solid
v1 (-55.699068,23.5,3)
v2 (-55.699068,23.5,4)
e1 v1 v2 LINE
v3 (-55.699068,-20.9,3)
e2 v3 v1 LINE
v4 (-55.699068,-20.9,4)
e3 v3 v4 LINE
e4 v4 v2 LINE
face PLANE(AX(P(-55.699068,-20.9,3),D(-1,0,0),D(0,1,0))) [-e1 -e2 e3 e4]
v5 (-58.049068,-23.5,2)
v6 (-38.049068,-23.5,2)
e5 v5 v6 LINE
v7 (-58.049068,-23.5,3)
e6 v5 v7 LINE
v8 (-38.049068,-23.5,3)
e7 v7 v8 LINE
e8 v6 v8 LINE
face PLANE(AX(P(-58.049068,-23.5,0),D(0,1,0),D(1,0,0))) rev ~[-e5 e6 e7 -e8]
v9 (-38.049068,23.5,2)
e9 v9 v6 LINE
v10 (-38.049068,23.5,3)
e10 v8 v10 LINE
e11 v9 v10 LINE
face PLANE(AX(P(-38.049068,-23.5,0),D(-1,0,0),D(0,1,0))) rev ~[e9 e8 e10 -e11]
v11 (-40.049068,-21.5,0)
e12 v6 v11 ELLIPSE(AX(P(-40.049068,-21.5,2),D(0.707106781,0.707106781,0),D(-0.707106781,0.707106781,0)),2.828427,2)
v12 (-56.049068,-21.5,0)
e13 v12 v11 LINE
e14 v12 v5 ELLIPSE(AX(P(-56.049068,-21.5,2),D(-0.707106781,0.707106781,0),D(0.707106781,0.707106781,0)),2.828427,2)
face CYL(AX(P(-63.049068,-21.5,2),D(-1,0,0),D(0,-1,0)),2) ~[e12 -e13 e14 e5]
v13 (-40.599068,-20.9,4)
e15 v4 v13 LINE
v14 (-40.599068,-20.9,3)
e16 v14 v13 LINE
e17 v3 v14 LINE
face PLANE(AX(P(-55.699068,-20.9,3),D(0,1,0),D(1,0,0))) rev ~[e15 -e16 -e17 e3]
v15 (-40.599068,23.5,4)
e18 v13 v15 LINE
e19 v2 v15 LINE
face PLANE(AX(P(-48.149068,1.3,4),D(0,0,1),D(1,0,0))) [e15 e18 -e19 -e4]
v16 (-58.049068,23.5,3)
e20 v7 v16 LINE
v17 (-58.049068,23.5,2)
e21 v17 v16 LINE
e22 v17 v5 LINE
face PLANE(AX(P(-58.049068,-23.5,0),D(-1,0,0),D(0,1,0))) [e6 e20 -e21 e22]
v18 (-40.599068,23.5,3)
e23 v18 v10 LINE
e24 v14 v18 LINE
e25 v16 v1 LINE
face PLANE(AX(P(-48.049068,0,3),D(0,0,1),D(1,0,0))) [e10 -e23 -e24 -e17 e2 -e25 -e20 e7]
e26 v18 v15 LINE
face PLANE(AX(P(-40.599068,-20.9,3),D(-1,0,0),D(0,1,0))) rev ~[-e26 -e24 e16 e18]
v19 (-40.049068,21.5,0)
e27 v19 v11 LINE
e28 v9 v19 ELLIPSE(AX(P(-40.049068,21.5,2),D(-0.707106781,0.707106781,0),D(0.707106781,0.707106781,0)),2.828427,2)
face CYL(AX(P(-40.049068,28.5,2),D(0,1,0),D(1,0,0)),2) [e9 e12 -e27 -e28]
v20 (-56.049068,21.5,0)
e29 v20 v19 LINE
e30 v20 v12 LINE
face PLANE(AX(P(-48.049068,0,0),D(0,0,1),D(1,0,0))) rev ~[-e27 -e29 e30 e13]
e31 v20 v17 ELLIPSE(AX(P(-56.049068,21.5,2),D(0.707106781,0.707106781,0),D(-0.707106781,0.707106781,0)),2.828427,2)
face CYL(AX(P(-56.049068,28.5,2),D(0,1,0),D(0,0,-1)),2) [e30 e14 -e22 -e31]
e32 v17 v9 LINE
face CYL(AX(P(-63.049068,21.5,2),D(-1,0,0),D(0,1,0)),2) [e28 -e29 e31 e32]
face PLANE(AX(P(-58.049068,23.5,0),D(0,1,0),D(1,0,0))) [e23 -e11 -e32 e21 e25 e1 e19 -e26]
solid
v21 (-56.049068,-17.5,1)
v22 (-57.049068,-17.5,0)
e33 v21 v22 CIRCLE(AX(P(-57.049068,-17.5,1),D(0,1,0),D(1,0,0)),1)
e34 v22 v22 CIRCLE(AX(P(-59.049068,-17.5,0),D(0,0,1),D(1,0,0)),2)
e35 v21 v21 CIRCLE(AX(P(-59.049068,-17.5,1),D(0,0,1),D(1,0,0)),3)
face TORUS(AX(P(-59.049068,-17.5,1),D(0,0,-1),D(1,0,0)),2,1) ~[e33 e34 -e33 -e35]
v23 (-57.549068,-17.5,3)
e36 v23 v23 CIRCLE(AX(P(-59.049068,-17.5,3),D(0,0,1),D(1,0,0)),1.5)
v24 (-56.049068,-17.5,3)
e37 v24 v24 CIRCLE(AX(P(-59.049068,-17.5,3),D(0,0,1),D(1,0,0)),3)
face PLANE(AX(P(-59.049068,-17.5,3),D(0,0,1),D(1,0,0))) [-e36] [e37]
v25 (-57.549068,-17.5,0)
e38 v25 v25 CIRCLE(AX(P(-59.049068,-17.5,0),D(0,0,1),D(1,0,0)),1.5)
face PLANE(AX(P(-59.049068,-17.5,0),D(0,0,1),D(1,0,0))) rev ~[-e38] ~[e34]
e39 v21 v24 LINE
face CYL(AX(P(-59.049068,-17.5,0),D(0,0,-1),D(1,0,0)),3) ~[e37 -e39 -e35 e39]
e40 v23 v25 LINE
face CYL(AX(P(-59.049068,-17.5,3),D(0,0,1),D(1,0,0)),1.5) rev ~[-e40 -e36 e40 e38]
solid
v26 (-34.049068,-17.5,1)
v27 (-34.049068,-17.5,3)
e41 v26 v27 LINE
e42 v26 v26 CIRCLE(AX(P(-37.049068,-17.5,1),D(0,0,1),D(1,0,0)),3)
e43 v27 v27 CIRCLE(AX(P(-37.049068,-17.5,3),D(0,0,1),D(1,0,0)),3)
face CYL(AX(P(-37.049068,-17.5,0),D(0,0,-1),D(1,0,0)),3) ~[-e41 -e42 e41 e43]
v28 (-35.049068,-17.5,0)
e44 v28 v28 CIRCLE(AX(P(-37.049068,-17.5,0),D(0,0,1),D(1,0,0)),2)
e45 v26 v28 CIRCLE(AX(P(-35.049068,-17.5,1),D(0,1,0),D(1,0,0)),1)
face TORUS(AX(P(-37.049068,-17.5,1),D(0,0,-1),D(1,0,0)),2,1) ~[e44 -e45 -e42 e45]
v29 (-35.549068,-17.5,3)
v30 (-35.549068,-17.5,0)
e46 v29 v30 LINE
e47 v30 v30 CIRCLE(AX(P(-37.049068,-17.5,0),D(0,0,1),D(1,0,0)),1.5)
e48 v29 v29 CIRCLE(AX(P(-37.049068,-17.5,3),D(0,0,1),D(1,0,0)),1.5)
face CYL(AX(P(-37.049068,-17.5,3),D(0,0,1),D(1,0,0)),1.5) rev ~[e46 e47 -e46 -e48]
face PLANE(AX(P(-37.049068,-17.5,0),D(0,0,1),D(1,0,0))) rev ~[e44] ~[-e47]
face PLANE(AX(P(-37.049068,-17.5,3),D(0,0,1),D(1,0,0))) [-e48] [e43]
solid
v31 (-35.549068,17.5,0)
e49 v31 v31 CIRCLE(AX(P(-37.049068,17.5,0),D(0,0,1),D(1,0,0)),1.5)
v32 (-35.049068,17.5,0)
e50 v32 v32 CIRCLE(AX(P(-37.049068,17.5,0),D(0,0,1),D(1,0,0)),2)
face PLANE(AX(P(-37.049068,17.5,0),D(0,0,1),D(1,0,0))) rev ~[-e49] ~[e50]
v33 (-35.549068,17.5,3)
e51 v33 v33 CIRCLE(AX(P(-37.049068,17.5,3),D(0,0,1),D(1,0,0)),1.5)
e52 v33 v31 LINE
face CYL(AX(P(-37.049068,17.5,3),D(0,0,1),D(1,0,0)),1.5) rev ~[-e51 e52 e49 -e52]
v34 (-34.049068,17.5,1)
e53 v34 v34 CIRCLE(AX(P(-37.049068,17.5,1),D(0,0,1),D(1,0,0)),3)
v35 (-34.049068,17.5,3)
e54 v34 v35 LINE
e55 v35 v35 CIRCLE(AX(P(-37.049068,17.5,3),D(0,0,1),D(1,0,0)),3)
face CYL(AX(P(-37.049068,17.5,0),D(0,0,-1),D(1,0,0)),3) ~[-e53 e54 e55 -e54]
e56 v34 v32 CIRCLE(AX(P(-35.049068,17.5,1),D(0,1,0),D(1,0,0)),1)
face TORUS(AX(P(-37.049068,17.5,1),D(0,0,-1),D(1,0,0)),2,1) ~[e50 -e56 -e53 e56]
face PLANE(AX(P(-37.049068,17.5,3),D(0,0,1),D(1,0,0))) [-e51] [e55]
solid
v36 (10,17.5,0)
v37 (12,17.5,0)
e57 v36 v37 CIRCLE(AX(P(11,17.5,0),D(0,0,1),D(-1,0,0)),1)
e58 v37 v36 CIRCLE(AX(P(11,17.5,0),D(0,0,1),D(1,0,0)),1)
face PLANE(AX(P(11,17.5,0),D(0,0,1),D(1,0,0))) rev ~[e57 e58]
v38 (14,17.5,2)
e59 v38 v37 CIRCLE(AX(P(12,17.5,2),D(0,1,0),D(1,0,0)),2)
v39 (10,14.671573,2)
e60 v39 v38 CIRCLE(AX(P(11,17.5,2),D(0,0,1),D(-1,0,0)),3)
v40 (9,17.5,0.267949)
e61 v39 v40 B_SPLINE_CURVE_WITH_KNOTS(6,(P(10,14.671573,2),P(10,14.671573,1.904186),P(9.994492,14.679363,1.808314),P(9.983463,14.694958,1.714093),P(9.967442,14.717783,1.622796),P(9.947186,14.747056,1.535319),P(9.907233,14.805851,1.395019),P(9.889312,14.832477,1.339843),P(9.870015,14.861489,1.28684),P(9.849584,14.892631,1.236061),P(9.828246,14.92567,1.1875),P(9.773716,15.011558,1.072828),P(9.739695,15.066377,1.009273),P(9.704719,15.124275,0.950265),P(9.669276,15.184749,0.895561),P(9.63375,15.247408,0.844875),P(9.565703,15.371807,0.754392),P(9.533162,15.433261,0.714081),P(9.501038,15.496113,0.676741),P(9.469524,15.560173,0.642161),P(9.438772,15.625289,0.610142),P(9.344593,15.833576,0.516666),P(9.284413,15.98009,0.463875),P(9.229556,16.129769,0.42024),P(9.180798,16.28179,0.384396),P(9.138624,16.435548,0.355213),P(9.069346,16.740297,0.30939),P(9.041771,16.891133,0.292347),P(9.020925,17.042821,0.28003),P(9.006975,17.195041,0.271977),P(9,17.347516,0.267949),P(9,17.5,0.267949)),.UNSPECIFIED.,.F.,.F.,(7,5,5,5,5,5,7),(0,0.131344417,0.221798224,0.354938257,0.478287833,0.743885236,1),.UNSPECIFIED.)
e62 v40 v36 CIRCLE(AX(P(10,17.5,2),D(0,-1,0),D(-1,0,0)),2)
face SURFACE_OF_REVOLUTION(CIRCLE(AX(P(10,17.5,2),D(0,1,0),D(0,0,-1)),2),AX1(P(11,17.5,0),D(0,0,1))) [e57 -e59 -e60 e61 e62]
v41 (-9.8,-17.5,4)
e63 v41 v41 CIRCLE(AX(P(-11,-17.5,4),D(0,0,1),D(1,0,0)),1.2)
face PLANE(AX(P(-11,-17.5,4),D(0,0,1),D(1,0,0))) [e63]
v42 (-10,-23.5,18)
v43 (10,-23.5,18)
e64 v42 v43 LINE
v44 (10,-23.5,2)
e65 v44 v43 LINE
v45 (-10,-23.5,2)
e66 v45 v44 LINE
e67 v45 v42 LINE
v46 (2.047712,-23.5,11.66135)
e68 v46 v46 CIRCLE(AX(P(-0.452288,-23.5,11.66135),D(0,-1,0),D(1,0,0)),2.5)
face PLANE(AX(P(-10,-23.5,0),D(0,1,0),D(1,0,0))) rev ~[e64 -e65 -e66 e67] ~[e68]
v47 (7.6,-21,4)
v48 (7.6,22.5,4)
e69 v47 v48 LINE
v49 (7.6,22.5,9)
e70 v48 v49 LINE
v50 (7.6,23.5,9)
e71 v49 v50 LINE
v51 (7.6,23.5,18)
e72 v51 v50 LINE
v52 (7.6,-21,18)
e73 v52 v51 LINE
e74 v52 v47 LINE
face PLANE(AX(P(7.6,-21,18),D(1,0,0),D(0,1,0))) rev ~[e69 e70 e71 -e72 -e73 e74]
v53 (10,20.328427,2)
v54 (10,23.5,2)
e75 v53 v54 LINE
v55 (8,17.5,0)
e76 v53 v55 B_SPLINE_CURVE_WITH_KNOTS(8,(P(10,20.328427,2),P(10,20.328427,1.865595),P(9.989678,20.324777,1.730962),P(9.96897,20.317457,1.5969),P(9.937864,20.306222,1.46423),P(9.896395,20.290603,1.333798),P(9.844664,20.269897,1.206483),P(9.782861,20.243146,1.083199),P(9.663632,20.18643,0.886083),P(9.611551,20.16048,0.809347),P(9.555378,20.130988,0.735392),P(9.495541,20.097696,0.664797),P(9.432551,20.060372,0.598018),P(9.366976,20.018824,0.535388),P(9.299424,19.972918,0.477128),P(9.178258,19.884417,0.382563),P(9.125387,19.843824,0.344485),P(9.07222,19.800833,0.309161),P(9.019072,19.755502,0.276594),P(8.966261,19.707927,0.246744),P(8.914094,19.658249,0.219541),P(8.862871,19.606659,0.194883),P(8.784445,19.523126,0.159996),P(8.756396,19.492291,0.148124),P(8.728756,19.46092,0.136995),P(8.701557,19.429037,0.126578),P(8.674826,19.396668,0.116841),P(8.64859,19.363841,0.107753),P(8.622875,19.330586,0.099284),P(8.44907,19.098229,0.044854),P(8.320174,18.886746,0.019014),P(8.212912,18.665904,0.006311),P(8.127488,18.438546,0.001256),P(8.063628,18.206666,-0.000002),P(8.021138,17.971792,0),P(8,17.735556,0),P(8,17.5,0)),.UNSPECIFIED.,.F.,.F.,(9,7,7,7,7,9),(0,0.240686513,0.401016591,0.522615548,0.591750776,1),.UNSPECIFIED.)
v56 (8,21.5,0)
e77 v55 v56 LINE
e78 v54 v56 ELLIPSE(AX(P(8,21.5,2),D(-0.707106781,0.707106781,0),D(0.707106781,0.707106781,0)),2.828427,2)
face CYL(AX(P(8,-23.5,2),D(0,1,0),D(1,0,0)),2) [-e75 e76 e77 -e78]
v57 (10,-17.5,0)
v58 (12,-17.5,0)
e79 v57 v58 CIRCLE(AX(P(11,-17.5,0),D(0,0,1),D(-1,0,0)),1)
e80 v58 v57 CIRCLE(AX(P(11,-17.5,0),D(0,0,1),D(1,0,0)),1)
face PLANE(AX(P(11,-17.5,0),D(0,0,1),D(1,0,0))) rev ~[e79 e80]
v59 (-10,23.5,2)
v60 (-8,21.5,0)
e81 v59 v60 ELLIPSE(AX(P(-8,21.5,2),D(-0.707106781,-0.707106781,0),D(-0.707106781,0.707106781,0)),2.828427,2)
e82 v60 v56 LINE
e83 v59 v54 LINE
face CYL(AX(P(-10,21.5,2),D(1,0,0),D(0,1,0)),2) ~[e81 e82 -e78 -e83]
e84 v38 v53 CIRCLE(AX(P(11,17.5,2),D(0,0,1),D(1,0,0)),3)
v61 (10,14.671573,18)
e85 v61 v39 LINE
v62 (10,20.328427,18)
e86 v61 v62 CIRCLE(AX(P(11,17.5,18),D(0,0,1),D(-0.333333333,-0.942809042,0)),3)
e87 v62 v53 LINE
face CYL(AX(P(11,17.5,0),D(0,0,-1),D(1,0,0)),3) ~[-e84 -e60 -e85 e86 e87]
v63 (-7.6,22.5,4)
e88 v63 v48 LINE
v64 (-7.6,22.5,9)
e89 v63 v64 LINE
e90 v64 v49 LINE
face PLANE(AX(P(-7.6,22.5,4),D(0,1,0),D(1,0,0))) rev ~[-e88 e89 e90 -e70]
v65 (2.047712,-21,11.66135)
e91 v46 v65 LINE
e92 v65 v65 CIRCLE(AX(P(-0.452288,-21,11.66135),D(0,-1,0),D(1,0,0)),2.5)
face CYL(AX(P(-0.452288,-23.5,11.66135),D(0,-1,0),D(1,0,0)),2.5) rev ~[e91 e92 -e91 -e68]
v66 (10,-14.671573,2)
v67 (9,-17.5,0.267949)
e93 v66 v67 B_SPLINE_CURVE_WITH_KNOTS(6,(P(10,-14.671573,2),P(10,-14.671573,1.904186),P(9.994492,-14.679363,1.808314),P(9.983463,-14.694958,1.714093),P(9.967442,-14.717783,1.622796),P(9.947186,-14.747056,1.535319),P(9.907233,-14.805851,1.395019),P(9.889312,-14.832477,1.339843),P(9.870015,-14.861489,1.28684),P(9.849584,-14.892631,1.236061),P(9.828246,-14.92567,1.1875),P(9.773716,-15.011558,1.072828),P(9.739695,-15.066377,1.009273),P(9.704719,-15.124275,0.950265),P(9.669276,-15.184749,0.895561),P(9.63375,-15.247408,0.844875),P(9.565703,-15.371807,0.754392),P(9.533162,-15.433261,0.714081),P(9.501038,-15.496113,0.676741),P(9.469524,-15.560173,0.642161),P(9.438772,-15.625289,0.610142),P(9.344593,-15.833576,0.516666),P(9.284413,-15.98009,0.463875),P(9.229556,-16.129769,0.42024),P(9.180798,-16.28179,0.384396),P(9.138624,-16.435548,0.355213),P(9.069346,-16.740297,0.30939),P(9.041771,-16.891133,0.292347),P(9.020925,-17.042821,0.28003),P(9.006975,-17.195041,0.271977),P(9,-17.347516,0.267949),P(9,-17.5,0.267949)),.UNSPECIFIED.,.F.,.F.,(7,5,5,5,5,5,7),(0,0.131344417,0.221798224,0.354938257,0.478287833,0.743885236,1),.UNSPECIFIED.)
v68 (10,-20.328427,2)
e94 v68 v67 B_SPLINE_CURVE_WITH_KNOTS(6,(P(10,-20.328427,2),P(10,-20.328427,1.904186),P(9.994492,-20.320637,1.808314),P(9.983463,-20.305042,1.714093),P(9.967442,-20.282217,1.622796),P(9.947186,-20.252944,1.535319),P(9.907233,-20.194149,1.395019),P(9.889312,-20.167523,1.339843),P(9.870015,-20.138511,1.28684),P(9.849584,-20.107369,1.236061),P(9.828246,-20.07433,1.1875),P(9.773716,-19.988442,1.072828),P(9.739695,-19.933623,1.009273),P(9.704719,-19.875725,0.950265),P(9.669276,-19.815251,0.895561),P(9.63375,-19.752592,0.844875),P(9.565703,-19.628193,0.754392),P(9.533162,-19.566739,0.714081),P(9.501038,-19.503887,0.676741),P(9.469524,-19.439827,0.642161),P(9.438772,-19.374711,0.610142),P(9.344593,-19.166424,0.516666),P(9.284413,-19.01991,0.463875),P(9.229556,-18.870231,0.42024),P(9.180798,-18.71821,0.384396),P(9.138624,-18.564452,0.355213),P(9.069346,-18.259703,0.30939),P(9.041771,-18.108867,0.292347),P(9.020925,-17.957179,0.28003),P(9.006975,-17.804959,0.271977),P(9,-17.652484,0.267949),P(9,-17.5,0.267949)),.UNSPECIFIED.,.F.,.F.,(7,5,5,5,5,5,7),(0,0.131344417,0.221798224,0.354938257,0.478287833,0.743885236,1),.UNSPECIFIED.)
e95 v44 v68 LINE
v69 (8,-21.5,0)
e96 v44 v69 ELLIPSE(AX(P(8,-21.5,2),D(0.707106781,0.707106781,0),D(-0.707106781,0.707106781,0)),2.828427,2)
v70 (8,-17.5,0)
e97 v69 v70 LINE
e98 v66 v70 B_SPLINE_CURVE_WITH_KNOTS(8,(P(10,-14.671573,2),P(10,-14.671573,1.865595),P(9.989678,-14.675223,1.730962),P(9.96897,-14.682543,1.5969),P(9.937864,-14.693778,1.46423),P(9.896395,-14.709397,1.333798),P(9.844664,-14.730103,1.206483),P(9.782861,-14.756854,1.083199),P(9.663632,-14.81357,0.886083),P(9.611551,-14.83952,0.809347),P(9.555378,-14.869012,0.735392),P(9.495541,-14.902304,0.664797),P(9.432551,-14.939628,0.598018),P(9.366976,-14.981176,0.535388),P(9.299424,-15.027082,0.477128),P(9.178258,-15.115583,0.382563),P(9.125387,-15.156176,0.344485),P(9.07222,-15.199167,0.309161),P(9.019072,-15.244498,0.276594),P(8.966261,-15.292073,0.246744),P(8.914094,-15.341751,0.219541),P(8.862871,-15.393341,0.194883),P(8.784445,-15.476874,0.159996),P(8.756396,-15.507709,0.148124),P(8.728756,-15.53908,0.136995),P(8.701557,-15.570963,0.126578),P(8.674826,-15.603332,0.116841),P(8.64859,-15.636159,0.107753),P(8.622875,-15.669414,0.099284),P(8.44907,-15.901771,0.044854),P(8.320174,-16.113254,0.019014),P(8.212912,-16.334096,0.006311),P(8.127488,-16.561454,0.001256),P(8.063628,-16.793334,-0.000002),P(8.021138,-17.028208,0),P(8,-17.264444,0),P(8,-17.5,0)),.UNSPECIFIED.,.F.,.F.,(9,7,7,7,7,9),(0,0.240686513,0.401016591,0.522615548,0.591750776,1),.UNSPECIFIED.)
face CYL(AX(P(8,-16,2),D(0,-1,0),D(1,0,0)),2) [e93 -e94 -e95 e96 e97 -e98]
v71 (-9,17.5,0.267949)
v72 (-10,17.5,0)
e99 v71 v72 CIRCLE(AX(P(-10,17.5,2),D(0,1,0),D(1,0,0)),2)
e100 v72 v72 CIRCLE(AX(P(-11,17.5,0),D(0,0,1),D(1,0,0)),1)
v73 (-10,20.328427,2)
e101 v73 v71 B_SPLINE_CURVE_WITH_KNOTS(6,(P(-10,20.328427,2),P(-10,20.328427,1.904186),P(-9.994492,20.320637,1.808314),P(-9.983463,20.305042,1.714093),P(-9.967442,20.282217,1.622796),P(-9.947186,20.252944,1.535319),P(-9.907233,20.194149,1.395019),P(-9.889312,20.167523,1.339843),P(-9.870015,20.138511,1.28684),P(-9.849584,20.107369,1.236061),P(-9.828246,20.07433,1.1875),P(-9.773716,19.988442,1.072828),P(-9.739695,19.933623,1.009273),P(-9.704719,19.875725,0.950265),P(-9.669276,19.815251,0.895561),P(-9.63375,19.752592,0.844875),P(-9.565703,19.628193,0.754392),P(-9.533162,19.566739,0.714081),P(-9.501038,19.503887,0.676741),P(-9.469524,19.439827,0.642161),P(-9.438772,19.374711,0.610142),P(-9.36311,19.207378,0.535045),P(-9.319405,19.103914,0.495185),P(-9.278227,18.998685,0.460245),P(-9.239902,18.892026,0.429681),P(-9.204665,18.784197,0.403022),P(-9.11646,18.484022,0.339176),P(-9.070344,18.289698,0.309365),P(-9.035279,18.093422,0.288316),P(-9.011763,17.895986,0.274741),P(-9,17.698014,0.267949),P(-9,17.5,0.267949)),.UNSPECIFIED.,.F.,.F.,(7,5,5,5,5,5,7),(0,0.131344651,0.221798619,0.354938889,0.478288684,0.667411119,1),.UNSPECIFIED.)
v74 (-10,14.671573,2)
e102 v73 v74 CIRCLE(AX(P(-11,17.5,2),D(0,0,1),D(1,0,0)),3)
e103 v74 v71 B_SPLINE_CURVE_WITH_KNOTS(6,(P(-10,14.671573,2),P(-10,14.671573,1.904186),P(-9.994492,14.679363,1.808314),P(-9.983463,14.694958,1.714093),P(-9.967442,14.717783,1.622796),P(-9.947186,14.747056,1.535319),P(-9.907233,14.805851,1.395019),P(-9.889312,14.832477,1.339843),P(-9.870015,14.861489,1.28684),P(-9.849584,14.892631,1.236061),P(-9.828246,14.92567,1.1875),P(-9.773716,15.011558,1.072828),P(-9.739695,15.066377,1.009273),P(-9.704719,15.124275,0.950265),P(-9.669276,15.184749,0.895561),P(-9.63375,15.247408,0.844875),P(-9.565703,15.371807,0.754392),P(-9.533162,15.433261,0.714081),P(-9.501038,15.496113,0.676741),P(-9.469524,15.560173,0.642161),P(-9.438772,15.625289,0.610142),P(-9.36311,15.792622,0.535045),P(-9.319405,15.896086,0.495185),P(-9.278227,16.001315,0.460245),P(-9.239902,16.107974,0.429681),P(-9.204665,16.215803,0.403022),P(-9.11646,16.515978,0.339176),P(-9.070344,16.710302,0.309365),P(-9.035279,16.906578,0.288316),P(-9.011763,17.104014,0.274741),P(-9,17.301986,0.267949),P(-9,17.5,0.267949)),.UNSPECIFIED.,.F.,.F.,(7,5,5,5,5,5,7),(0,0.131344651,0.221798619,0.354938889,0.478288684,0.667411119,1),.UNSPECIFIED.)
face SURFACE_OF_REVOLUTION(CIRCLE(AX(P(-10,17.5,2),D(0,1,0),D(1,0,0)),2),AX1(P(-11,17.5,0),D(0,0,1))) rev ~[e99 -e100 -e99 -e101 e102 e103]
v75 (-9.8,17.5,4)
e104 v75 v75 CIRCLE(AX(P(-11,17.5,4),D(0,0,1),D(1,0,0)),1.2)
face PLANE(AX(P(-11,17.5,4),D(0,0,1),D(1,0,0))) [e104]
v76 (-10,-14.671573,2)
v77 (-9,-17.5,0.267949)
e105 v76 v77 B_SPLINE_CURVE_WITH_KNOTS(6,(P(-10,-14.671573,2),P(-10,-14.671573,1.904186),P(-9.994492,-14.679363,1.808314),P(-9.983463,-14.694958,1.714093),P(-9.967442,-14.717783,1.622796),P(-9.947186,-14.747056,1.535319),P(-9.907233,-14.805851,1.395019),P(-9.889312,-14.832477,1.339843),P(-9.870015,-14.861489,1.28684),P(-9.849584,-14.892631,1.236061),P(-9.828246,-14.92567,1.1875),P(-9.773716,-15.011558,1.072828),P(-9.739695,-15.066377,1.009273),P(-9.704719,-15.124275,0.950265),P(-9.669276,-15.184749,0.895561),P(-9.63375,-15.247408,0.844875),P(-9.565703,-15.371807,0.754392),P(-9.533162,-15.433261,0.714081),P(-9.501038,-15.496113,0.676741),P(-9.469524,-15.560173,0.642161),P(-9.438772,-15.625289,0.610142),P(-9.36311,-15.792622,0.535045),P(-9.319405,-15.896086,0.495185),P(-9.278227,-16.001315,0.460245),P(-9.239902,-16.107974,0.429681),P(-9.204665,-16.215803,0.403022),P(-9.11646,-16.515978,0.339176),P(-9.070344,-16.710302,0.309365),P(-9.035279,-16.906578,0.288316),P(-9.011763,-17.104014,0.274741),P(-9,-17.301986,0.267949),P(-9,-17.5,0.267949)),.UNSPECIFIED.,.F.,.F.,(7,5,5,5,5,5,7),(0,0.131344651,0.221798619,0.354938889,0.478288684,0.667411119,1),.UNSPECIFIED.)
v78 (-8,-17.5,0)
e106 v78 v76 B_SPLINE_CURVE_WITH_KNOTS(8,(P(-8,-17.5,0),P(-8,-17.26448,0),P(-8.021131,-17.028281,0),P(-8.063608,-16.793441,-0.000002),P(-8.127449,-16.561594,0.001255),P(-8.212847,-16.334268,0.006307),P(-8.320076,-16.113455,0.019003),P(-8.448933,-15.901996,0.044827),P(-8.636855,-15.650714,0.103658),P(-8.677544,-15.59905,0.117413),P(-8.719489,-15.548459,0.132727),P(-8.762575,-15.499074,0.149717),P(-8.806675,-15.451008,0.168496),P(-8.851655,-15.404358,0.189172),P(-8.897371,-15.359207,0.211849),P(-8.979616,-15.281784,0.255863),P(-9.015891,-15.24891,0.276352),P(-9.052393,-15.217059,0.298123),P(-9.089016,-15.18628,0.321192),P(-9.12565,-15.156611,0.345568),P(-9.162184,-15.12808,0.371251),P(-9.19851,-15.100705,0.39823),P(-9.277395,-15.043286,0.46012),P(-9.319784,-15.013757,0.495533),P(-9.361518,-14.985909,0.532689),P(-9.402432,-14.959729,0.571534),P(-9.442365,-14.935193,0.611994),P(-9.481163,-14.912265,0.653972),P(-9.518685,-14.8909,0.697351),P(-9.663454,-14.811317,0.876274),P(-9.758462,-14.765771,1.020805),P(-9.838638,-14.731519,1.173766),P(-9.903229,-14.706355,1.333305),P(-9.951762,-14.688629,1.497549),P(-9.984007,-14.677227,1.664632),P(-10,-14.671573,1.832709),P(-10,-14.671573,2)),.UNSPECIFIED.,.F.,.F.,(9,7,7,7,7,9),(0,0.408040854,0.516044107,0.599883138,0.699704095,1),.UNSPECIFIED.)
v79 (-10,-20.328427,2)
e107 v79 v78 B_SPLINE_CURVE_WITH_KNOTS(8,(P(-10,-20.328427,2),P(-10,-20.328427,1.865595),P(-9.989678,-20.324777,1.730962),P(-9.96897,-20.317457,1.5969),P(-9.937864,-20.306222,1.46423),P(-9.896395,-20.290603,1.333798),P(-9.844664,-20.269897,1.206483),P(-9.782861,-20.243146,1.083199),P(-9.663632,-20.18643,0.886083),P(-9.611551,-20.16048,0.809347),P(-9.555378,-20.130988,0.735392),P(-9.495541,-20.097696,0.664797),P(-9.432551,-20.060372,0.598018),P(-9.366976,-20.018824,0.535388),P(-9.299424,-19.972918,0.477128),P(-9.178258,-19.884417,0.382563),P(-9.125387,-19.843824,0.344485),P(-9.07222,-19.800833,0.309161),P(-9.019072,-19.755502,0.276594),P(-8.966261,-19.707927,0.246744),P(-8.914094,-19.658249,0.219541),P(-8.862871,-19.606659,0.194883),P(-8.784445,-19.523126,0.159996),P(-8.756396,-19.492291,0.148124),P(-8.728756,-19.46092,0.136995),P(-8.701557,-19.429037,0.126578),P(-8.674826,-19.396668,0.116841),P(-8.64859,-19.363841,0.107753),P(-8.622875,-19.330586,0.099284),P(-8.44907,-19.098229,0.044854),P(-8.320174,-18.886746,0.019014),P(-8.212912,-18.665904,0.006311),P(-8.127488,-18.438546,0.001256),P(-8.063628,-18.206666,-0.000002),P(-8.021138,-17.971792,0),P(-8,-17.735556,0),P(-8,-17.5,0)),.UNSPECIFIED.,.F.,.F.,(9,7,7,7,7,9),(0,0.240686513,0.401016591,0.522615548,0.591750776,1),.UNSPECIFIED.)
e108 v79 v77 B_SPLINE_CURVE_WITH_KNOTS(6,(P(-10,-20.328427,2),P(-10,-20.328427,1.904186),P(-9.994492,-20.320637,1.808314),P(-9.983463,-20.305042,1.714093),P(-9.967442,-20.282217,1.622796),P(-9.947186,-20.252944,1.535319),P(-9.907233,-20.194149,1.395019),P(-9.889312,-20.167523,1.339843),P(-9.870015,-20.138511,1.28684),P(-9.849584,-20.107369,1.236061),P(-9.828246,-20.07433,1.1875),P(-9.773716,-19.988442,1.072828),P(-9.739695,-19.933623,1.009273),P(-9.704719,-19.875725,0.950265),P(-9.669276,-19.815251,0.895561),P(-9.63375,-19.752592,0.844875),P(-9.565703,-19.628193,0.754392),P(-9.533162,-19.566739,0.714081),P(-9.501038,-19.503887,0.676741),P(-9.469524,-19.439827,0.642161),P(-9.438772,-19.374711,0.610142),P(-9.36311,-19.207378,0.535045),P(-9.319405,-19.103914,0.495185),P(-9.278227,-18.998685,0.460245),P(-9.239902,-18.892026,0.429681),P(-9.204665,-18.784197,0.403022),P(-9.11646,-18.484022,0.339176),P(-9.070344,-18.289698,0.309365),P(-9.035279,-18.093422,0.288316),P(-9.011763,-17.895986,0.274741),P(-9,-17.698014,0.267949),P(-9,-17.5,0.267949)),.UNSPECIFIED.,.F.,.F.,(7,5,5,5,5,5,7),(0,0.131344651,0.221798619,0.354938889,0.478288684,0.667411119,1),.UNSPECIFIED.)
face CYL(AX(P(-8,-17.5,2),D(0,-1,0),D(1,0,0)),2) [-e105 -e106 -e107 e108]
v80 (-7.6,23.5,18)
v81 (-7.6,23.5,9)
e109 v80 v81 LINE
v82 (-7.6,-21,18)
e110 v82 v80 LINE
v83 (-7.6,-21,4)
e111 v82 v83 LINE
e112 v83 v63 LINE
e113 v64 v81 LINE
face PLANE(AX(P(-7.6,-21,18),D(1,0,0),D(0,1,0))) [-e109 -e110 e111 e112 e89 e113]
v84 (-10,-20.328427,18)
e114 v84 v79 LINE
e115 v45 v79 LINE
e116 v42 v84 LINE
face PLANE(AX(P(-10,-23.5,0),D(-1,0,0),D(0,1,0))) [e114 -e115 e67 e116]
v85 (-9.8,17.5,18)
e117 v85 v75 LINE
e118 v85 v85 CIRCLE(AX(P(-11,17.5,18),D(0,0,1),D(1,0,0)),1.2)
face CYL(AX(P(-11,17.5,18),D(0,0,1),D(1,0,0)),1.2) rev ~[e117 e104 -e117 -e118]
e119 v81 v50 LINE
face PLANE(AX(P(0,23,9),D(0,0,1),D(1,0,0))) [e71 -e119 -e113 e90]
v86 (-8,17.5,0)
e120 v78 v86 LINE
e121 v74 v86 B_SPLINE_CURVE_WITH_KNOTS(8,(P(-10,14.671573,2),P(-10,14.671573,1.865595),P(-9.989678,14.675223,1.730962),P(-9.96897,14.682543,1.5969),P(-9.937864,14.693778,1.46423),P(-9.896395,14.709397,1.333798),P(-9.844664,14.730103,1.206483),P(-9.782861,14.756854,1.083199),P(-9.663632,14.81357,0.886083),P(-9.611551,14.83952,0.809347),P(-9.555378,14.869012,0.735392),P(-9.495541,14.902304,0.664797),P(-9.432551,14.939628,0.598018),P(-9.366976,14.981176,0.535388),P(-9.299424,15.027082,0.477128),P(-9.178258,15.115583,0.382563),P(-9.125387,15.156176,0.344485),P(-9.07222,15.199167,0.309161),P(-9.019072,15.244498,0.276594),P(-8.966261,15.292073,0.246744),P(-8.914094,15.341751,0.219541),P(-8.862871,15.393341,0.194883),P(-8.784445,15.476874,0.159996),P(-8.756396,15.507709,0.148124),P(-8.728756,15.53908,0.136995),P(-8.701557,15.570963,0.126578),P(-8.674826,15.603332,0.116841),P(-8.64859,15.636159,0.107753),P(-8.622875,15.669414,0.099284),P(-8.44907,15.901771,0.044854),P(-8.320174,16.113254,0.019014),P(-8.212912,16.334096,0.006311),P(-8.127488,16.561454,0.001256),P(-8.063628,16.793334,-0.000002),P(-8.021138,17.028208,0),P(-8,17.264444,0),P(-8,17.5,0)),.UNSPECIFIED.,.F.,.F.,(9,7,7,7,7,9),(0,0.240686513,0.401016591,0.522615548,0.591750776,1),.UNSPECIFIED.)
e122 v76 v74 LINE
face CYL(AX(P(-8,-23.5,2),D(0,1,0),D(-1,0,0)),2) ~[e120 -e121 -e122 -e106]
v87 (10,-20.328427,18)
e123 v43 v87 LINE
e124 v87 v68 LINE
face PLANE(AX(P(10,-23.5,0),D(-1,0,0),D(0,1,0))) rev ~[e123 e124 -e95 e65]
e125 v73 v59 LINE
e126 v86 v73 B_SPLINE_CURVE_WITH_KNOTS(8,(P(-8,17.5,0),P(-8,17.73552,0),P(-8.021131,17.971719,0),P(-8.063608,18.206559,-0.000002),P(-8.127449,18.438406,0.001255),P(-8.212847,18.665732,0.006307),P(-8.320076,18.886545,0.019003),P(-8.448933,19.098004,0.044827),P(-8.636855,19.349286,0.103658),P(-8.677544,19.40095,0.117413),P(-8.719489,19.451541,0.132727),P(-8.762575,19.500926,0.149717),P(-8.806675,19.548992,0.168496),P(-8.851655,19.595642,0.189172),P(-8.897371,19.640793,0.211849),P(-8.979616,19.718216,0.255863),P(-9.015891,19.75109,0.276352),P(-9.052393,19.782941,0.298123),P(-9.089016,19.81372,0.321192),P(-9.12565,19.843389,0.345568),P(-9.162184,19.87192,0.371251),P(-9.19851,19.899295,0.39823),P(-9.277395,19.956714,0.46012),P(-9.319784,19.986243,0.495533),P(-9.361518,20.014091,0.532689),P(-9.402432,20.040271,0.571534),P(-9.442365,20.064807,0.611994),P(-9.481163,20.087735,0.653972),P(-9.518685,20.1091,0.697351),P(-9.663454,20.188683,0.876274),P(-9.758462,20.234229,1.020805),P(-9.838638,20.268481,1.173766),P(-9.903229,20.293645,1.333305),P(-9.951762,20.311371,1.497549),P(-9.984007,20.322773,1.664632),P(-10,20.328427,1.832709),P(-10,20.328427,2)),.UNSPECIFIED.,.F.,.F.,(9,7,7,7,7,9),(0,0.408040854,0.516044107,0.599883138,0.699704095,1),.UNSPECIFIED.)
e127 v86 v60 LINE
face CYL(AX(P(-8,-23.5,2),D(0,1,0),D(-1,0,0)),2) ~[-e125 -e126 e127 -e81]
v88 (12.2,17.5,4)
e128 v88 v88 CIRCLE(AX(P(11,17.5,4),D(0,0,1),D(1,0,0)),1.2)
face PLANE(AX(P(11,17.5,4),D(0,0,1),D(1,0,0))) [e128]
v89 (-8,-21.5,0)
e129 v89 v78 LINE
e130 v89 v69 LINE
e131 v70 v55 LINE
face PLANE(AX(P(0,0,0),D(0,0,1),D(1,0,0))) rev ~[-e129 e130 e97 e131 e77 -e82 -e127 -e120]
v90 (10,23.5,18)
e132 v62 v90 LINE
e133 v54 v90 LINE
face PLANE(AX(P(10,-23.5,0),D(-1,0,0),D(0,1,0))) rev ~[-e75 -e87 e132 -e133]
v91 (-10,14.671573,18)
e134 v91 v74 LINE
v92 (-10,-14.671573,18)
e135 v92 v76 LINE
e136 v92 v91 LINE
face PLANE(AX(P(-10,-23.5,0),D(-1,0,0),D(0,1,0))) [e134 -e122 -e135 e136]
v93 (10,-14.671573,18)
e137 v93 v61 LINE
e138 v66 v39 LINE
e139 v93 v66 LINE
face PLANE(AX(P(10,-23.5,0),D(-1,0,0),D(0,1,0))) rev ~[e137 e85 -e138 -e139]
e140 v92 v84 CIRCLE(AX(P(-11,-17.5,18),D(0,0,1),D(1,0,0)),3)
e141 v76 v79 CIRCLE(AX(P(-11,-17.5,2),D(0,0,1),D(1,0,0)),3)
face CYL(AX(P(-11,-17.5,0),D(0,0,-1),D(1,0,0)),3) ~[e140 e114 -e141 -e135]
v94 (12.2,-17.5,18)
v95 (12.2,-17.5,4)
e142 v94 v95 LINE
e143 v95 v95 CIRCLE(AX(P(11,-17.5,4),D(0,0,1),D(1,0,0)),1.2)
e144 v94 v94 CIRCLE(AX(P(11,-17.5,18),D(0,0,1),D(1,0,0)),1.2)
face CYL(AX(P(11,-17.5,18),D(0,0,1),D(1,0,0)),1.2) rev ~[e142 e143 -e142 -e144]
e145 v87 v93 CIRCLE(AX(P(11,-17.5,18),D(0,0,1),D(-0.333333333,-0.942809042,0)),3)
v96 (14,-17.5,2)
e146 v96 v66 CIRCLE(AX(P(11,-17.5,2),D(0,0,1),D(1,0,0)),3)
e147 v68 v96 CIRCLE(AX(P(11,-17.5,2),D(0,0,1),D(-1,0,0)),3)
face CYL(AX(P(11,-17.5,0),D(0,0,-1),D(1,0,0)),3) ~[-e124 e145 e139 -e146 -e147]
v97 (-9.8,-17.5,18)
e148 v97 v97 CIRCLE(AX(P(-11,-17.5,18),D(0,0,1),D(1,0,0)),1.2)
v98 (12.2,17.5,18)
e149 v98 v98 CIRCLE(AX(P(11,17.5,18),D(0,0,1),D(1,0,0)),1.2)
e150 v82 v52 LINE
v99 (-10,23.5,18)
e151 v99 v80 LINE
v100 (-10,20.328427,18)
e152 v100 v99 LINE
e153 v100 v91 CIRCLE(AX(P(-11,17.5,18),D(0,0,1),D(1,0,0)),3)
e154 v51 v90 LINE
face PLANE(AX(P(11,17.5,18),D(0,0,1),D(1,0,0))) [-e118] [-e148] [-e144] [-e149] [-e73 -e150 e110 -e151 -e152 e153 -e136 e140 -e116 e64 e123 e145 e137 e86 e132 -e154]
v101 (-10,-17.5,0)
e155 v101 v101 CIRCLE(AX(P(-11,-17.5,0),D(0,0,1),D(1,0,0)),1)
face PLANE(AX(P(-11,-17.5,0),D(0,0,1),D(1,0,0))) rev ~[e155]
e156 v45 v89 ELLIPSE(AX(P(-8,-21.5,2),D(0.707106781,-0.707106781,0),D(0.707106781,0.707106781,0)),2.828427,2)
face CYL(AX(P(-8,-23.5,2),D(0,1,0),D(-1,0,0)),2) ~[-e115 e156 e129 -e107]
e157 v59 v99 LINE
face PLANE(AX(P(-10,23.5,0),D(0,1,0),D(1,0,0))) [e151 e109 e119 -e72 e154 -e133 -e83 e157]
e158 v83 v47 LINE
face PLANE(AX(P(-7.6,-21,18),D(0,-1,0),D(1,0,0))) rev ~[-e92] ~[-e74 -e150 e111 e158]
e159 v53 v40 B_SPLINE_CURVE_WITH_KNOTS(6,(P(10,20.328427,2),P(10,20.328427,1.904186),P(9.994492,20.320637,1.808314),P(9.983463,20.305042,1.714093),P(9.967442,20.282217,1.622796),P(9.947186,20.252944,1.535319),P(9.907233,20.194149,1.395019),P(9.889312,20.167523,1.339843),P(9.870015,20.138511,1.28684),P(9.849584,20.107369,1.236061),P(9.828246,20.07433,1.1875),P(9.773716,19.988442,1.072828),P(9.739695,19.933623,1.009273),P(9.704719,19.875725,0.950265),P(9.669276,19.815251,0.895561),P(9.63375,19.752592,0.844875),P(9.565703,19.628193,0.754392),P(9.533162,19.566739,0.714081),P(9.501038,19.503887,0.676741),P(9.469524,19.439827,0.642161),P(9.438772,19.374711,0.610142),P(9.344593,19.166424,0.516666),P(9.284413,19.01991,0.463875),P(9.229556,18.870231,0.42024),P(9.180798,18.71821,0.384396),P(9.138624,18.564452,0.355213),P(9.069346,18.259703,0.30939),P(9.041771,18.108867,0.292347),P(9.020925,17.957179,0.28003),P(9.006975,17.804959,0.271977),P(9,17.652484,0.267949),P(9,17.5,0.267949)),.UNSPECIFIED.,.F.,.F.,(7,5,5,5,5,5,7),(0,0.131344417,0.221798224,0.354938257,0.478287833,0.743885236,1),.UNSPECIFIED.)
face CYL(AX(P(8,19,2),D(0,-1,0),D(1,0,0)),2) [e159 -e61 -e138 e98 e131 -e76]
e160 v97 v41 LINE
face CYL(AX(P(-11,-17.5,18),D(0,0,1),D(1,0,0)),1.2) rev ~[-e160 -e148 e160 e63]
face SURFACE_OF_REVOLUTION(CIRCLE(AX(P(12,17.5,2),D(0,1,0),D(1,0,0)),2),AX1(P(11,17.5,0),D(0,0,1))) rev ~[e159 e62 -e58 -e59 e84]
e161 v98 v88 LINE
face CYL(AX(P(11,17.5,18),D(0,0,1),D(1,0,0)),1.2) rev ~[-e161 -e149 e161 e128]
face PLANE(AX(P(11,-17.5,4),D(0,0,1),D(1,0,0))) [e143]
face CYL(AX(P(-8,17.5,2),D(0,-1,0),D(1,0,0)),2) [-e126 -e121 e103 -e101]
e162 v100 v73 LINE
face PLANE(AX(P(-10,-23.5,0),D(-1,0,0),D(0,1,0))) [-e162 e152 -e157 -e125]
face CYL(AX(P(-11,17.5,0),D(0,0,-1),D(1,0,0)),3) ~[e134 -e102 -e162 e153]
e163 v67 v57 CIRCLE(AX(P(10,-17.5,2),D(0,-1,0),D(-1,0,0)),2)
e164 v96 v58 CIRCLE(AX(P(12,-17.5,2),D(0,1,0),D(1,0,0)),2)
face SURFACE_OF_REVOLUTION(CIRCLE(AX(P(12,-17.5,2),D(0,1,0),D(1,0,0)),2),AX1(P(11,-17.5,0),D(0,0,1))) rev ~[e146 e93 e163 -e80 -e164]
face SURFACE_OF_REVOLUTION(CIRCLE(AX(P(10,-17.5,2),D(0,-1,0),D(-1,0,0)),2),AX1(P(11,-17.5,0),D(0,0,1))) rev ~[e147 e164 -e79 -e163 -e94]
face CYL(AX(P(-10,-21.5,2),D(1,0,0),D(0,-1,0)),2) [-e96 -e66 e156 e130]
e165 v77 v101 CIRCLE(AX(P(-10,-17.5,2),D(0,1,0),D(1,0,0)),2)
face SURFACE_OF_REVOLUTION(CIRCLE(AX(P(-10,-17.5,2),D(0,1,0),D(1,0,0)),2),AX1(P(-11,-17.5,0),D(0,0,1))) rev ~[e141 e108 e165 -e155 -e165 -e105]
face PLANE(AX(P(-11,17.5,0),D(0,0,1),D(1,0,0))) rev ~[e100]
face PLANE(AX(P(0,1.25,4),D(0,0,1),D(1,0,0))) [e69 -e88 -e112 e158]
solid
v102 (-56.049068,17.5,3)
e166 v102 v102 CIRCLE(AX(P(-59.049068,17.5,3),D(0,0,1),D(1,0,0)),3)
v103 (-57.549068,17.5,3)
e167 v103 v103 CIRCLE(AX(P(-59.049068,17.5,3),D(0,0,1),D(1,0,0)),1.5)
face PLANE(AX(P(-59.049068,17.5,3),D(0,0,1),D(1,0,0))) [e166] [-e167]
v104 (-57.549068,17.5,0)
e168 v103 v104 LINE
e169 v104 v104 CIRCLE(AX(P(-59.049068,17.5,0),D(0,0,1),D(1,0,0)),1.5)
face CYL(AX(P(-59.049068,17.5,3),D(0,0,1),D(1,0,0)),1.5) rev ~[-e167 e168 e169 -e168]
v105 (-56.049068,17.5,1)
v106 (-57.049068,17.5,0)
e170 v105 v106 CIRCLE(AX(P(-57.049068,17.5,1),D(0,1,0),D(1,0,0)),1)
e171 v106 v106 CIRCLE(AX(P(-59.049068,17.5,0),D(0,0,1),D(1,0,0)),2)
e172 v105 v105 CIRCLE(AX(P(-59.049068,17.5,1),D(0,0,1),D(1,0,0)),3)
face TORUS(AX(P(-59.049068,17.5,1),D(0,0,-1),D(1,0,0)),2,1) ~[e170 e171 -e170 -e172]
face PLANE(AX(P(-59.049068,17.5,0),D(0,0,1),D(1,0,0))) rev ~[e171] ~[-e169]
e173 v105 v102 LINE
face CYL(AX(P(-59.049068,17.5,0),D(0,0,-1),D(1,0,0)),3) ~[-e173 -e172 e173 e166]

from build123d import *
from build123d import SkipClean  # not in build123d's __all__

# Parameters (mm, degrees)
F0_W           = 20
F0_H           = 47
F1_DEPTH       = 18
F2_R           = 2
F3_W           = 15.2
F3_H           = 44.5
F4_DEPTH       = 14
F8_W           = 15.2
F8_H           = 1
F9_DEPTH       = 5
F10_R          = 2.5
F11_DEPTH      = 10
F12_W          = 20
F12_H          = 47
F13_DEPTH      = 3
F14_W          = 15.1
F14_H          = 44.4
F15_DEPTH      = 1
F17_R          = 3
F19_DEPTH      = 18
F18_R          = 3
F20_DEPTH      = 3
F21_S5_R       = 2
F21_T6_DEPTH   = 6
F21_T10_ANGLE  = 180
F21_S11_R      = 2
F21_T12_DEPTH  = 5
F21_T16_ANGLE  = 180
F21_S17_R      = 2
F21_T18_DEPTH  = 5
F21_T22_ANGLE  = 180
F21_S23_R      = 2
F21_T24_DEPTH  = 5
F21_T28_ANGLE  = 180
F21_S29_R      = 2
F21_T30_DEPTH  = 5
F21_S35_R      = 2
F21_T36_DEPTH  = 6
F21_2_T1_DEPTH = 57
F21_2_T3_DEPTH = 30
F22_R          = 1
F22_2_R        = 1
F22_3_R        = 1
F22_4_R        = 1
F24_R          = 1.2
F25_DEPTH      = 14
F23_R          = 1.5
F26_DEPTH      = 5


# Not quite as in the source:
# - a fillet or chamfer that OpenCascade refuses, or shapes differently, is made with other operations: its cross-section is extruded or revolved along the edge and cut away or added
# - a feature of the source that left no trace in its solid (it failed there, or was rolled back) is left out
# - the program builds the solid bodies; features that only make, move or delete a surface that nothing else refers to are left out


with BuildPart() as f1:
    # F0 (on Top) → F1 (new body)
    with BuildSketch(Plane.XY):
        Rectangle(F0_W, F0_H)
    extrude(amount=F1_DEPTH)

    # F2
    f2_edges = [f1.edges().sort_by_distance(p)[0] for p in [
        (-10, 0, 0),
        (0, 23.5, 0),
        (10, 0, 0),
        (0, -23.5, 0),
    ]]
    fillet(f2_edges, radius=F2_R)

    # F3 (on face) → F4 (cut)
    with BuildSketch(Plane.XY.offset(18)):
        with Locations((0, 1.25)):
            Rectangle(F3_W, F3_H)
    extrude(amount=-F4_DEPTH, mode=Mode.SUBTRACT)

    # F8 (on face) → F9 (join)
    with BuildSketch(Plane.XY.offset(4)):
        with Locations((0, 23)):
            Rectangle(F8_W, F8_H)
    extrude(amount=F9_DEPTH)

    # F10 (on face) → F11 (cut)
    with BuildSketch(Plane.XZ.offset(23.5)):
        with Locations((-0.4522884265, 11.6613497958)):
            Circle(F10_R)
    extrude(amount=-F11_DEPTH, mode=Mode.SUBTRACT)

    # F17 (on Top) → F19 (join)
    with BuildSketch(Plane.XY):
        with Locations((11, 17.5)):
            Circle(F17_R)
        with Locations((11, -17.5)):
            Circle(F17_R)
        with Locations((-11, 17.5)):
            Circle(F17_R)
        with Locations((-11, -17.5)):
            Circle(F17_R)
    with SkipClean():  # cleaning this boolean's faces spoils the solid; the shape is the same uncleaned
        extrude(amount=F19_DEPTH)

    # F21: fillet of radius 2 on 6 edges, made by hand


with BuildPart() as f13:
    # F12 (on Top) → F13 (new body)
    with BuildSketch(Plane.XY):
        with Locations((-48.0490680784, 0)):
            Rectangle(F12_W, F12_H)
    extrude(amount=F13_DEPTH)

    # F14 (on face) → F15 (join)
    with BuildSketch(Plane.XY.offset(3)):
        with Locations((-48.1490680784, 1.3)):
            Rectangle(F14_W, F14_H)
    extrude(amount=F15_DEPTH)

    # F21#2: fillet of radius 2 on 4 edges, made by hand

    # F21_2_s2 → F21_2_t1 (cut)
    with BuildSketch(Plane.XZ.offset(-28.5)):
        with BuildLine():
            ThreePointArc((-38.0490680784, 2), (-38.634854516, 0.5857864376), (-40.0490680784, 0))
            Line((-40.0490680784, 0), (-38.0490680784, 0))
            Line((-38.0490680784, 0), (-38.0490680784, 2))
        make_face()
        with BuildLine():
            ThreePointArc((-56.0490680784, 0), (-57.4632816408, 0.5857864376), (-58.0490680784, 2))
            Line((-58.0490680784, 2), (-58.0490680784, 0))
            Line((-58.0490680784, 0), (-56.0490680784, 0))
        make_face()
    extrude(amount=F21_2_T1_DEPTH, mode=Mode.SUBTRACT)

    # F21_2_s4 → F21_2_t3 (cut)
    with BuildSketch(Plane.YZ.offset(-63.0490680784)):
        with BuildLine():
            ThreePointArc((-23.5, 2), (-22.9142135624, 0.5857864376), (-21.5, 0))
            Line((-21.5, 0), (-23.5, 0))
            Line((-23.5, 0), (-23.5, 2))
        make_face()
        with BuildLine():
            ThreePointArc((23.5, 2), (22.9142135624, 0.5857864376), (21.5, 0))
            Line((21.5, 0), (23.5, 0))
            Line((23.5, 0), (23.5, 2))
        make_face()
    extrude(amount=F21_2_T3_DEPTH, mode=Mode.SUBTRACT)


with BuildPart() as f20:
    # F18 (on Top) → F20 (new body)
    with BuildSketch(Plane.XY):
        with Locations((-37.0490680784, 17.5)):
            Circle(F18_R)
    extrude(amount=F20_DEPTH)

    # F22
    f22_edges = [f20.edges().sort_by_distance(p)[0] for p in [
        (-40.049068, 17.5, 0),
    ]]
    fillet(f22_edges, radius=F22_R)


with BuildPart() as f20b:
    # F18 (on Top) → F20, piece 2 (new body)
    with BuildSketch(Plane.XY):
        with Locations((-37.0490680784, -17.5)):
            Circle(F18_R)
    extrude(amount=F20_DEPTH)

    # F22#2
    f22_2_edges = [f20b.edges().sort_by_distance(p)[0] for p in [
        (-40.049068, -17.5, 0),
    ]]
    fillet(f22_2_edges, radius=F22_2_R)


with BuildPart() as f20c:
    # F18 (on Top) → F20, piece 3 (new body)
    with BuildSketch(Plane.XY):
        with Locations((-59.0490680784, 17.5)):
            Circle(F18_R)
    extrude(amount=F20_DEPTH)

    # F22#3
    f22_3_edges = [f20c.edges().sort_by_distance(p)[0] for p in [
        (-62.049068, 17.5, 0),
    ]]
    fillet(f22_3_edges, radius=F22_3_R)


with BuildPart() as f20d:
    # F18 (on Top) → F20, piece 4 (new body)
    with BuildSketch(Plane.XY):
        with Locations((-59.0490680784, -17.5)):
            Circle(F18_R)
    extrude(amount=F20_DEPTH)

    # F22#4
    f22_4_edges = [f20d.edges().sort_by_distance(p)[0] for p in [
        (-62.049068, -17.5, 0),
    ]]
    fillet(f22_4_edges, radius=F22_4_R)


with BuildPart() as f21_tool2:
    # F21_s3 → F21_t4 (revolve)
    with BuildSketch(Plane.XZ.offset(-17.5)):
        with BuildLine():
            ThreePointArc((-8, 2), (-8.5857864376, 0.5857864376), (-10, 0))
            Line((-10, 0), (-8, 0))
            Line((-8, 0), (-8, 2))
        make_face()
    revolve(axis=Axis((-11, 17.5, 0), (0, 0, 1)))

    # F21_s5 → F21_t6 (cut, symmetric)
    with BuildSketch(Plane.XZ.offset(-17.5)):
        with Locations((-8, 2)):
            Circle(F21_S5_R)
    extrude(amount=F21_T6_DEPTH, both=True, mode=Mode.SUBTRACT)


with BuildPart() as f1_1:
    add(f1.part, clean=False)

    # F21_t1: cut F21_tool2
    add(f21_tool2.part, mode=Mode.SUBTRACT)


with BuildPart() as f21_tool8:
    # F21_s9 → F21_t10 (revolve)
    with BuildSketch(Plane.XZ.offset(-17.5)):
        with BuildLine():
            ThreePointArc((14, 2), (13.4142135624, 0.5857864376), (12, 0))
            Line((12, 0), (14, 0))
            Line((14, 0), (14, 2))
        make_face()
    revolve(axis=Axis((11, 17.5, 0), (0, 0, 1)), revolution_arc=F21_T10_ANGLE)

    # F21_s11 → F21_t12 (cut, symmetric)
    with BuildSketch(Plane.XZ.offset(-19)):
        with Locations((8, 2)):
            Circle(F21_S11_R)
    extrude(amount=F21_T12_DEPTH, both=True, mode=Mode.SUBTRACT)


with BuildPart() as f1_2:
    add(f1_1.part, clean=False)

    # F21_t7: cut F21_tool8
    add(f21_tool8.part, mode=Mode.SUBTRACT)


with BuildPart() as f21_tool14:
    # F21_s15 → F21_t16 (revolve)
    with BuildSketch(Plane.XZ.offset(-17.5)):
        with BuildLine():
            ThreePointArc((10, 0), (8.5857864376, 0.5857864376), (8, 2))
            Line((8, 2), (8, 0))
            Line((8, 0), (10, 0))
        make_face()
    revolve(axis=Axis((11, 17.5, 0), (0, 0, 1)), revolution_arc=F21_T16_ANGLE)

    # F21_s17 → F21_t18 (cut, symmetric)
    with BuildSketch(Plane.XZ.offset(-16)):
        with Locations((8, 2)):
            Circle(F21_S17_R)
    extrude(amount=F21_T18_DEPTH, both=True, mode=Mode.SUBTRACT)


with BuildPart() as f1_3:
    add(f1_2.part, clean=False)

    # F21_t13: cut F21_tool14
    add(f21_tool14.part, mode=Mode.SUBTRACT)


with BuildPart() as f21_tool20:
    # F21_s21 → F21_t22 (revolve)
    with BuildSketch(Plane.XZ.offset(17.5)):
        with BuildLine():
            ThreePointArc((14, 2), (13.4142135624, 0.5857864376), (12, 0))
            Line((12, 0), (14, 0))
            Line((14, 0), (14, 2))
        make_face()
    revolve(axis=Axis((11, -17.5, 0), (0, 0, 1)), revolution_arc=F21_T22_ANGLE)

    # F21_s23 → F21_t24 (cut, symmetric)
    with BuildSketch(Plane.XZ.offset(16)):
        with Locations((8, 2)):
            Circle(F21_S23_R)
    extrude(amount=F21_T24_DEPTH, both=True, mode=Mode.SUBTRACT)


with BuildPart() as f1_4:
    add(f1_3.part, clean=False)

    # F21_t19: cut F21_tool20
    add(f21_tool20.part, mode=Mode.SUBTRACT)


with BuildPart() as f21_tool26:
    # F21_s27 → F21_t28 (revolve)
    with BuildSketch(Plane.XZ.offset(17.5)):
        with BuildLine():
            ThreePointArc((8, 2), (8.5857864376, 0.5857864376), (10, 0))
            Line((10, 0), (8, 0))
            Line((8, 0), (8, 2))
        make_face()
    revolve(axis=Axis((11, -17.5, 0), (0, 0, 1)), revolution_arc=F21_T28_ANGLE)

    # F21_s29 → F21_t30 (cut, symmetric)
    with BuildSketch(Plane.XZ.offset(19)):
        with Locations((8, 2)):
            Circle(F21_S29_R)
    extrude(amount=F21_T30_DEPTH, both=True, mode=Mode.SUBTRACT)


with BuildPart() as f1_5:
    add(f1_4.part, clean=False)

    # F21_t25: cut F21_tool26
    add(f21_tool26.part, mode=Mode.SUBTRACT)


with BuildPart() as f21_tool32:
    # F21_s33 → F21_t34 (revolve)
    with BuildSketch(Plane.XZ.offset(17.5)):
        with BuildLine():
            ThreePointArc((-8, 2), (-8.5857864376, 0.5857864376), (-10, 0))
            Line((-10, 0), (-8, 0))
            Line((-8, 0), (-8, 2))
        make_face()
    revolve(axis=Axis((-11, -17.5, 0), (0, 0, 1)))

    # F21_s35 → F21_t36 (cut, symmetric)
    with BuildSketch(Plane.XZ.offset(17.5)):
        with Locations((-8, 2)):
            Circle(F21_S35_R)
    extrude(amount=F21_T36_DEPTH, both=True, mode=Mode.SUBTRACT)


with BuildPart() as f1_6:
    add(f1_5.part, clean=False)

    # F21_t31: cut F21_tool32
    add(f21_tool32.part, mode=Mode.SUBTRACT)

    # F24 (on face) → F25 (cut)
    with BuildSketch(Plane.XY.offset(18)):
        with Locations((11, 17.5)):
            Circle(F24_R)
        with Locations((11, -17.5)):
            Circle(F24_R)
        with Locations((-11, 17.5)):
            Circle(F24_R)
        with Locations((-11, -17.5)):
            Circle(F24_R)
    extrude(amount=-F25_DEPTH, mode=Mode.SUBTRACT)


with BuildPart() as f26_tool:
    # F23 (on face) → F26 (new body)
    with BuildSketch(Plane.XY.offset(3)):
        with Locations((-37.0490680784, 17.5)):
            Circle(F23_R)
        with Locations((-59.0490680784, 17.5)):
            Circle(F23_R)
        with Locations((-59.0490680784, -17.5)):
            Circle(F23_R)
        with Locations((-37.0490680784, -17.5)):
            Circle(F23_R)
    extrude(amount=-F26_DEPTH)


with BuildPart() as f20_1:
    add(f20.part, clean=False)

    # F26: cut by f26_tool
    add(f26_tool.part, mode=Mode.SUBTRACT)


with BuildPart() as f20b_1:
    add(f20b.part, clean=False)

    # F26: cut by f26_tool
    add(f26_tool.part, mode=Mode.SUBTRACT)


with BuildPart() as f20c_1:
    add(f20c.part, clean=False)

    # F26: cut by f26_tool
    add(f26_tool.part, mode=Mode.SUBTRACT)


with BuildPart() as f20d_1:
    add(f20d.part, clean=False)

    # F26: cut by f26_tool
    add(f26_tool.part, mode=Mode.SUBTRACT)


solid = Compound([f13.part, f1_6.part, f20_1.part, f20b_1.part, f20c_1.part, f20d_1.part])
